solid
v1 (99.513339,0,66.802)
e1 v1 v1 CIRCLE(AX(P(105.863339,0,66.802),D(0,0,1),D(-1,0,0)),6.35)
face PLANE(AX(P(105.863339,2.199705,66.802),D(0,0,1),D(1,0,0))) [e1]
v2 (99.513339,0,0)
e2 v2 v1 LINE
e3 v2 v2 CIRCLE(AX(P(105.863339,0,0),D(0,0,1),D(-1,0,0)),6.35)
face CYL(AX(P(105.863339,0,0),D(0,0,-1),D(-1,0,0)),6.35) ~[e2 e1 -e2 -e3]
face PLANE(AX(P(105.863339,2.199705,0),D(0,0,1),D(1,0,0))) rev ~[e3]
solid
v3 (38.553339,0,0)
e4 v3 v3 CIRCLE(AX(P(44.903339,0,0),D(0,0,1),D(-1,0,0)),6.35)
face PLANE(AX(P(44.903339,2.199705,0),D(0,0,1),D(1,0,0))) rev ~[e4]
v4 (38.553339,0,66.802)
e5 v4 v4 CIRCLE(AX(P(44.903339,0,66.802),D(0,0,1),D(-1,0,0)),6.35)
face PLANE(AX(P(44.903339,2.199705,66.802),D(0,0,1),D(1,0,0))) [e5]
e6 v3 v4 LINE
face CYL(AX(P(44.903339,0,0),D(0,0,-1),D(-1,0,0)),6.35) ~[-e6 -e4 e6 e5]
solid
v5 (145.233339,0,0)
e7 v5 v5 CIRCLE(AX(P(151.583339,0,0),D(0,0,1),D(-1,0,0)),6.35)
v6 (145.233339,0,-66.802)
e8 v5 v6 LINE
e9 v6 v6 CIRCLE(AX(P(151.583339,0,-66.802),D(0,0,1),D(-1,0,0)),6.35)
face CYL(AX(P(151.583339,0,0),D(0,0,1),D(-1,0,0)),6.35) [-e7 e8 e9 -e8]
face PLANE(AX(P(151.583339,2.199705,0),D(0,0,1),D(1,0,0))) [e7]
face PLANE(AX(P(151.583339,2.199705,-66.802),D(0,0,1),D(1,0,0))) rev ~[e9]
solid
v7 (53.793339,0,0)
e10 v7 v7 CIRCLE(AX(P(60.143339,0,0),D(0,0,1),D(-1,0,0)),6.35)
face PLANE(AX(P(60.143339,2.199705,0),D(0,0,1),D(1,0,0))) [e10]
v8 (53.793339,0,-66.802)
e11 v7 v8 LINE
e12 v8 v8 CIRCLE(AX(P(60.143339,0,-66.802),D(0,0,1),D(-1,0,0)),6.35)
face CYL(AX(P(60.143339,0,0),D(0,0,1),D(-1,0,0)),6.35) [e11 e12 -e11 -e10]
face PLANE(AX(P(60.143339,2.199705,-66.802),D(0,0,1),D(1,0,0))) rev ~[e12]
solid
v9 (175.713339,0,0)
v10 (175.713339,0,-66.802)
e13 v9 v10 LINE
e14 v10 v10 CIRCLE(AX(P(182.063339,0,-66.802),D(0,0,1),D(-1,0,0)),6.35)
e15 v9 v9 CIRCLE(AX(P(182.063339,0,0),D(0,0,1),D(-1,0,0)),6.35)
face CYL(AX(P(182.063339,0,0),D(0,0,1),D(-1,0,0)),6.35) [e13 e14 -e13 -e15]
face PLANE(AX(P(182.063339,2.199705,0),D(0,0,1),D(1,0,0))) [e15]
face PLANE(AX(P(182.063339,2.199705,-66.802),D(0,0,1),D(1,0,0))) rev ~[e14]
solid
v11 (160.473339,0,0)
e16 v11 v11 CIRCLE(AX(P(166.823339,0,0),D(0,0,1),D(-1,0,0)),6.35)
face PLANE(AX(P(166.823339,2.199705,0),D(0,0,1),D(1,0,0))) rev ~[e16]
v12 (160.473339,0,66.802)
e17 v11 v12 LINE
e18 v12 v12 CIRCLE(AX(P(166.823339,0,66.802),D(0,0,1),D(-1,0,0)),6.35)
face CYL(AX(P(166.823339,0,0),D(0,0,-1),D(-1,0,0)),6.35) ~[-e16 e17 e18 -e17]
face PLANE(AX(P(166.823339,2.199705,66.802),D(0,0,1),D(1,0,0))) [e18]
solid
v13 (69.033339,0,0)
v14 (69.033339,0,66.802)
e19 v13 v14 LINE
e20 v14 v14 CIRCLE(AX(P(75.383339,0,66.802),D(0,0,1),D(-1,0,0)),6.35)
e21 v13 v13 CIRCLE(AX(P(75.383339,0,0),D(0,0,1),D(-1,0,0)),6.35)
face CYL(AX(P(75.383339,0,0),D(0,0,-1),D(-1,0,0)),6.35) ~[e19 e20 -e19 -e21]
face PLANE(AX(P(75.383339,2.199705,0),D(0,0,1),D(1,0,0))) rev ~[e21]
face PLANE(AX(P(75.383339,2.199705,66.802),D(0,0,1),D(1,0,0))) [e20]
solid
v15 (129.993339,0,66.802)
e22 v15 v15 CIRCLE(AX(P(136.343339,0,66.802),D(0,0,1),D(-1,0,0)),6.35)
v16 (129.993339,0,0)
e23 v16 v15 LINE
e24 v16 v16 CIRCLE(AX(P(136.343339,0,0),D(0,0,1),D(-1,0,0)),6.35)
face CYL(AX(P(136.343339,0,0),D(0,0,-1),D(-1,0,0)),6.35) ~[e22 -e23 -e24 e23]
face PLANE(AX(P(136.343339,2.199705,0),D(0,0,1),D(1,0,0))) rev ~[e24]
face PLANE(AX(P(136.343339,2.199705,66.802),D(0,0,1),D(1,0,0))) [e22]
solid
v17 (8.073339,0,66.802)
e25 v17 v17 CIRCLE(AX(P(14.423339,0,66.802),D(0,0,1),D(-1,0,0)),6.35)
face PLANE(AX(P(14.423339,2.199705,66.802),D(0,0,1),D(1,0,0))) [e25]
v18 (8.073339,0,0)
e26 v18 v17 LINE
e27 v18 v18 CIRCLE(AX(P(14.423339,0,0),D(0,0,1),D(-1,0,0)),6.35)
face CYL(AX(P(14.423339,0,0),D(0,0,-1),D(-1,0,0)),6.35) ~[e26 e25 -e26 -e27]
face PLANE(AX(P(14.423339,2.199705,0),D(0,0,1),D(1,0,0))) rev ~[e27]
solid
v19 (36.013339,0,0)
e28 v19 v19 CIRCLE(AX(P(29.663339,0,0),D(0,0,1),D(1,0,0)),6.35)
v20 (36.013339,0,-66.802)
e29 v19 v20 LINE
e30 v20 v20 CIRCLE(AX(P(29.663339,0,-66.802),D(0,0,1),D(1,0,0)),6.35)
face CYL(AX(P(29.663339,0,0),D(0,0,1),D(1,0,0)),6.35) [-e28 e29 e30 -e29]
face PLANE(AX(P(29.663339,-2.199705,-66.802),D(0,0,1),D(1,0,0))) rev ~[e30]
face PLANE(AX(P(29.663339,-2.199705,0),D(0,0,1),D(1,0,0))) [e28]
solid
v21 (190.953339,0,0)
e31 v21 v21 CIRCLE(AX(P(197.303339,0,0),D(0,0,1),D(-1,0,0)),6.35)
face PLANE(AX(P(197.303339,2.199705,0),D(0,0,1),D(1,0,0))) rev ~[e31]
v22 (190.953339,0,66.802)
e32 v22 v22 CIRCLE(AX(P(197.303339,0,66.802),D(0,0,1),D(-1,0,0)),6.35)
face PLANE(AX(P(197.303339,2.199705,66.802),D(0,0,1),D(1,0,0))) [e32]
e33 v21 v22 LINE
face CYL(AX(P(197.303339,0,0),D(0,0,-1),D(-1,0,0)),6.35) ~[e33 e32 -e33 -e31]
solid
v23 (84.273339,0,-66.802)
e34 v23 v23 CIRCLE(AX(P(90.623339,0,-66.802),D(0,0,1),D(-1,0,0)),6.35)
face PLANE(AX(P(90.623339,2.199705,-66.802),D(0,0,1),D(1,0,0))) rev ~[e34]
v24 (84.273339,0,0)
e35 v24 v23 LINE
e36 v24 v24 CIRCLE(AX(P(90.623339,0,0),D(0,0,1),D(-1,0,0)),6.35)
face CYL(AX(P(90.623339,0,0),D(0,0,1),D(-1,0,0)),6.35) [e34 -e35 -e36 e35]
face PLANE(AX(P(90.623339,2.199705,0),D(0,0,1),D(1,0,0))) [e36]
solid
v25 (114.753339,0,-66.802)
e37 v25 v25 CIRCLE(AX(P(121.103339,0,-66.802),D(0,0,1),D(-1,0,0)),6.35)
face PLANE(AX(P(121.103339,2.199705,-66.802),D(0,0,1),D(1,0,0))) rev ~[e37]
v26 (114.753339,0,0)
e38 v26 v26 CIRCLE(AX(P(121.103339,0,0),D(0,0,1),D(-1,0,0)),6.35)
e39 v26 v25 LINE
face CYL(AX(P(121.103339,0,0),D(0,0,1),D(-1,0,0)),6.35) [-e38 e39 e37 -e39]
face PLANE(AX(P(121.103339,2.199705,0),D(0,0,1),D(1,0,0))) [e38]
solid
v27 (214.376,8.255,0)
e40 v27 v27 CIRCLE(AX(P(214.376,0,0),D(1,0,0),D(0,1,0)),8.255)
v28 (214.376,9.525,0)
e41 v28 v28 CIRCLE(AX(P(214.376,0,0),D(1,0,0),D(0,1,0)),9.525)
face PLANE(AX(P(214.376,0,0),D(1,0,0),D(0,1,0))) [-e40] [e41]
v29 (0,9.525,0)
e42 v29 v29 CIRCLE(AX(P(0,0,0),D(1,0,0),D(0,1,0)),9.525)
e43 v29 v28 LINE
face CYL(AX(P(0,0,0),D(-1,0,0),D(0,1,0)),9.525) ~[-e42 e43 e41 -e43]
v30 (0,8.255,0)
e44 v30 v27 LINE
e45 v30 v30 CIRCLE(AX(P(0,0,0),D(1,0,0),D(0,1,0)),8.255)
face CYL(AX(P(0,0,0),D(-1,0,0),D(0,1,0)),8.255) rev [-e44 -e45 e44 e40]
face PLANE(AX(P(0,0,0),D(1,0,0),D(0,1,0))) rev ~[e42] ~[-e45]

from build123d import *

# Parameters (mm, degrees)
F0_R     = 9.525
F0_R_2   = 8.255
F1_DEPTH = 214.376
F3_DEPTH = 66.802
F4_DEPTH = 66.802


with BuildPart() as f1:
    # F0 (on Right) → F1 (new body)
    with BuildSketch(Plane.YZ):
        Circle(F0_R)
        Circle(F0_R_2, mode=Mode.SUBTRACT)
    extrude(amount=F1_DEPTH)


with BuildPart() as f3:
    # F2 (on Top) → F3 (new body)
    with BuildSketch(Plane.XY):
        with BuildLine():
            ThreePointArc((20.7733392388, 0), (14.4233392388, 6.35), (8.0733392388, 0))
            Line((8.0733392388, 0), (14.4233392388, 0))
            Line((14.4233392388, 0), (20.7733392388, 0))
        make_face()
        with BuildLine():
            Line((14.4233392388, 0), (8.0733392388, 0))
            ThreePointArc((8.0733392388, 0), (14.4233392388, -6.35), (20.7733392388, 0))
            Line((20.7733392388, 0), (14.4233392388, 0))
        make_face()
    extrude(amount=F3_DEPTH)


with BuildPart() as f3b:
    # F2 (on Top) → F3, piece 2 (new body)
    with BuildSketch(Plane.XY):
        with BuildLine():
            ThreePointArc((203.6533392388, 0), (197.3033392388, 6.35), (190.9533392388, 0))
            Line((190.9533392388, 0), (198.5922306776, 0))
            Line((198.5922306776, 0), (203.6533392388, 0))
        make_face()
        with BuildLine():
            Line((198.5922306776, 0), (190.9533392388, 0))
            ThreePointArc((190.9533392388, 0), (197.3033392388, -6.35), (203.6533392388, 0))
            Line((203.6533392388, 0), (198.5922306776, 0))
        make_face()
    extrude(amount=F3_DEPTH)


with BuildPart() as f3c:
    # F2 (on Top) → F3, piece 3 (new body)
    with BuildSketch(Plane.XY):
        with BuildLine():
            ThreePointArc((173.1733392388, 0), (166.8233392388, 6.35), (160.4733392388, 0))
            Line((160.4733392388, 0), (173.1733392388, 0))
        make_face()
        with BuildLine():
            Line((173.1733392388, 0), (160.4733392388, 0))
            ThreePointArc((160.4733392388, 0), (166.8233392388, -6.35), (173.1733392388, 0))
        make_face()
    extrude(amount=F3_DEPTH)


with BuildPart() as f3d:
    # F2 (on Top) → F3, piece 4 (new body)
    with BuildSketch(Plane.XY):
        with BuildLine():
            ThreePointArc((142.6933392388, 0), (136.3433392388, 6.35), (129.9933392388, 0))
            Line((129.9933392388, 0), (142.6933392388, 0))
        make_face()
        with BuildLine():
            Line((142.6933392388, 0), (129.9933392388, 0))
            ThreePointArc((129.9933392388, 0), (136.3433392388, -6.35), (142.6933392388, 0))
        make_face()
    extrude(amount=F3_DEPTH)


with BuildPart() as f3e:
    # F2 (on Top) → F3, piece 5 (new body)
    with BuildSketch(Plane.XY):
        with BuildLine():
            ThreePointArc((112.2133392388, 0), (105.8633392388, 6.35), (99.5133392388, 0))
            Line((99.5133392388, 0), (112.2133392388, 0))
        make_face()
        with BuildLine():
            Line((112.2133392388, 0), (99.5133392388, 0))
            ThreePointArc((99.5133392388, 0), (105.8633392388, -6.35), (112.2133392388, 0))
        make_face()
    extrude(amount=F3_DEPTH)


with BuildPart() as f3f:
    # F2 (on Top) → F3, piece 6 (new body)
    with BuildSketch(Plane.XY):
        with BuildLine():
            ThreePointArc((81.7333392388, 0), (75.3833392388, 6.35), (69.0333392388, 0))
            Line((69.0333392388, 0), (81.7333392388, 0))
        make_face()
        with BuildLine():
            Line((81.7333392388, 0), (69.0333392388, 0))
            ThreePointArc((69.0333392388, 0), (75.3833392388, -6.35), (81.7333392388, 0))
        make_face()
    extrude(amount=F3_DEPTH)


with BuildPart() as f3g:
    # F2 (on Top) → F3, piece 7 (new body)
    with BuildSketch(Plane.XY):
        with BuildLine():
            ThreePointArc((51.2533392388, 0), (44.9033392388, 6.35), (38.5533392388, 0))
            Line((38.5533392388, 0), (51.2533392388, 0))
        make_face()
        with BuildLine():
            Line((51.2533392388, 0), (38.5533392388, 0))
            ThreePointArc((38.5533392388, 0), (44.9033392388, -6.35), (51.2533392388, 0))
        make_face()
    extrude(amount=F3_DEPTH)


with BuildPart() as f4:
    # F2 (on Top) → F4 (new body)
    with BuildSketch(Plane.XY):
        with BuildLine():
            Line((36.0133392388, 0), (23.3133392388, 0))
            ThreePointArc((23.3133392388, 0), (29.6633392388, -6.35), (36.0133392388, 0))
        make_face()
        with BuildLine():
            ThreePointArc((36.0133392388, 0), (29.6633392388, 6.35), (23.3133392388, 0))
            Line((23.3133392388, 0), (36.0133392388, 0))
        make_face()
    extrude(amount=-F4_DEPTH)


with BuildPart() as f4b:
    # F2 (on Top) → F4, piece 2 (new body)
    with BuildSketch(Plane.XY):
        with BuildLine():
            ThreePointArc((66.4933392388, 0), (60.1433392388, 6.35), (53.7933392388, 0))
            Line((53.7933392388, 0), (66.4933392388, 0))
        make_face()
        with BuildLine():
            Line((66.4933392388, 0), (53.7933392388, 0))
            ThreePointArc((53.7933392388, 0), (60.1433392388, -6.35), (66.4933392388, 0))
        make_face()
    extrude(amount=-F4_DEPTH)


with BuildPart() as f4c:
    # F2 (on Top) → F4, piece 3 (new body)
    with BuildSketch(Plane.XY):
        with BuildLine():
            ThreePointArc((96.9733392388, 0), (90.6233392388, 6.35), (84.2733392388, 0))
            Line((84.2733392388, 0), (96.9733392388, 0))
        make_face()
        with BuildLine():
            Line((96.9733392388, 0), (84.2733392388, 0))
            ThreePointArc((84.2733392388, 0), (90.6233392388, -6.35), (96.9733392388, 0))
        make_face()
    extrude(amount=-F4_DEPTH)


with BuildPart() as f4d:
    # F2 (on Top) → F4, piece 4 (new body)
    with BuildSketch(Plane.XY):
        with BuildLine():
            ThreePointArc((127.4533392388, 0), (121.1033392388, 6.35), (114.7533392388, 0))
            Line((114.7533392388, 0), (127.4533392388, 0))
        make_face()
        with BuildLine():
            Line((127.4533392388, 0), (114.7533392388, 0))
            ThreePointArc((114.7533392388, 0), (121.1033392388, -6.35), (127.4533392388, 0))
        make_face()
    extrude(amount=-F4_DEPTH)


with BuildPart() as f4e:
    # F2 (on Top) → F4, piece 5 (new body)
    with BuildSketch(Plane.XY):
        with BuildLine():
            ThreePointArc((157.9333392388, 0), (151.5833392388, 6.35), (145.2333392388, 0))
            Line((145.2333392388, 0), (157.9333392388, 0))
        make_face()
        with BuildLine():
            Line((157.9333392388, 0), (145.2333392388, 0))
            ThreePointArc((145.2333392388, 0), (151.5833392388, -6.35), (157.9333392388, 0))
        make_face()
    extrude(amount=-F4_DEPTH)


with BuildPart() as f4f:
    # F2 (on Top) → F4, piece 6 (new body)
    with BuildSketch(Plane.XY):
        with BuildLine():
            ThreePointArc((188.4133392388, 0), (182.0633392388, 6.35), (175.7133392388, 0))
            Line((175.7133392388, 0), (188.4133392388, 0))
        make_face()
        with BuildLine():
            Line((188.4133392388, 0), (175.7133392388, 0))
            ThreePointArc((175.7133392388, 0), (182.0633392388, -6.35), (188.4133392388, 0))
        make_face()
    extrude(amount=-F4_DEPTH)


solid = Compound([f1.part, f3.part, f3b.part, f3c.part, f3d.part, f3e.part, f3f.part, f3g.part, f4.part, f4b.part, f4c.part, f4d.part, f4e.part, f4f.part])
